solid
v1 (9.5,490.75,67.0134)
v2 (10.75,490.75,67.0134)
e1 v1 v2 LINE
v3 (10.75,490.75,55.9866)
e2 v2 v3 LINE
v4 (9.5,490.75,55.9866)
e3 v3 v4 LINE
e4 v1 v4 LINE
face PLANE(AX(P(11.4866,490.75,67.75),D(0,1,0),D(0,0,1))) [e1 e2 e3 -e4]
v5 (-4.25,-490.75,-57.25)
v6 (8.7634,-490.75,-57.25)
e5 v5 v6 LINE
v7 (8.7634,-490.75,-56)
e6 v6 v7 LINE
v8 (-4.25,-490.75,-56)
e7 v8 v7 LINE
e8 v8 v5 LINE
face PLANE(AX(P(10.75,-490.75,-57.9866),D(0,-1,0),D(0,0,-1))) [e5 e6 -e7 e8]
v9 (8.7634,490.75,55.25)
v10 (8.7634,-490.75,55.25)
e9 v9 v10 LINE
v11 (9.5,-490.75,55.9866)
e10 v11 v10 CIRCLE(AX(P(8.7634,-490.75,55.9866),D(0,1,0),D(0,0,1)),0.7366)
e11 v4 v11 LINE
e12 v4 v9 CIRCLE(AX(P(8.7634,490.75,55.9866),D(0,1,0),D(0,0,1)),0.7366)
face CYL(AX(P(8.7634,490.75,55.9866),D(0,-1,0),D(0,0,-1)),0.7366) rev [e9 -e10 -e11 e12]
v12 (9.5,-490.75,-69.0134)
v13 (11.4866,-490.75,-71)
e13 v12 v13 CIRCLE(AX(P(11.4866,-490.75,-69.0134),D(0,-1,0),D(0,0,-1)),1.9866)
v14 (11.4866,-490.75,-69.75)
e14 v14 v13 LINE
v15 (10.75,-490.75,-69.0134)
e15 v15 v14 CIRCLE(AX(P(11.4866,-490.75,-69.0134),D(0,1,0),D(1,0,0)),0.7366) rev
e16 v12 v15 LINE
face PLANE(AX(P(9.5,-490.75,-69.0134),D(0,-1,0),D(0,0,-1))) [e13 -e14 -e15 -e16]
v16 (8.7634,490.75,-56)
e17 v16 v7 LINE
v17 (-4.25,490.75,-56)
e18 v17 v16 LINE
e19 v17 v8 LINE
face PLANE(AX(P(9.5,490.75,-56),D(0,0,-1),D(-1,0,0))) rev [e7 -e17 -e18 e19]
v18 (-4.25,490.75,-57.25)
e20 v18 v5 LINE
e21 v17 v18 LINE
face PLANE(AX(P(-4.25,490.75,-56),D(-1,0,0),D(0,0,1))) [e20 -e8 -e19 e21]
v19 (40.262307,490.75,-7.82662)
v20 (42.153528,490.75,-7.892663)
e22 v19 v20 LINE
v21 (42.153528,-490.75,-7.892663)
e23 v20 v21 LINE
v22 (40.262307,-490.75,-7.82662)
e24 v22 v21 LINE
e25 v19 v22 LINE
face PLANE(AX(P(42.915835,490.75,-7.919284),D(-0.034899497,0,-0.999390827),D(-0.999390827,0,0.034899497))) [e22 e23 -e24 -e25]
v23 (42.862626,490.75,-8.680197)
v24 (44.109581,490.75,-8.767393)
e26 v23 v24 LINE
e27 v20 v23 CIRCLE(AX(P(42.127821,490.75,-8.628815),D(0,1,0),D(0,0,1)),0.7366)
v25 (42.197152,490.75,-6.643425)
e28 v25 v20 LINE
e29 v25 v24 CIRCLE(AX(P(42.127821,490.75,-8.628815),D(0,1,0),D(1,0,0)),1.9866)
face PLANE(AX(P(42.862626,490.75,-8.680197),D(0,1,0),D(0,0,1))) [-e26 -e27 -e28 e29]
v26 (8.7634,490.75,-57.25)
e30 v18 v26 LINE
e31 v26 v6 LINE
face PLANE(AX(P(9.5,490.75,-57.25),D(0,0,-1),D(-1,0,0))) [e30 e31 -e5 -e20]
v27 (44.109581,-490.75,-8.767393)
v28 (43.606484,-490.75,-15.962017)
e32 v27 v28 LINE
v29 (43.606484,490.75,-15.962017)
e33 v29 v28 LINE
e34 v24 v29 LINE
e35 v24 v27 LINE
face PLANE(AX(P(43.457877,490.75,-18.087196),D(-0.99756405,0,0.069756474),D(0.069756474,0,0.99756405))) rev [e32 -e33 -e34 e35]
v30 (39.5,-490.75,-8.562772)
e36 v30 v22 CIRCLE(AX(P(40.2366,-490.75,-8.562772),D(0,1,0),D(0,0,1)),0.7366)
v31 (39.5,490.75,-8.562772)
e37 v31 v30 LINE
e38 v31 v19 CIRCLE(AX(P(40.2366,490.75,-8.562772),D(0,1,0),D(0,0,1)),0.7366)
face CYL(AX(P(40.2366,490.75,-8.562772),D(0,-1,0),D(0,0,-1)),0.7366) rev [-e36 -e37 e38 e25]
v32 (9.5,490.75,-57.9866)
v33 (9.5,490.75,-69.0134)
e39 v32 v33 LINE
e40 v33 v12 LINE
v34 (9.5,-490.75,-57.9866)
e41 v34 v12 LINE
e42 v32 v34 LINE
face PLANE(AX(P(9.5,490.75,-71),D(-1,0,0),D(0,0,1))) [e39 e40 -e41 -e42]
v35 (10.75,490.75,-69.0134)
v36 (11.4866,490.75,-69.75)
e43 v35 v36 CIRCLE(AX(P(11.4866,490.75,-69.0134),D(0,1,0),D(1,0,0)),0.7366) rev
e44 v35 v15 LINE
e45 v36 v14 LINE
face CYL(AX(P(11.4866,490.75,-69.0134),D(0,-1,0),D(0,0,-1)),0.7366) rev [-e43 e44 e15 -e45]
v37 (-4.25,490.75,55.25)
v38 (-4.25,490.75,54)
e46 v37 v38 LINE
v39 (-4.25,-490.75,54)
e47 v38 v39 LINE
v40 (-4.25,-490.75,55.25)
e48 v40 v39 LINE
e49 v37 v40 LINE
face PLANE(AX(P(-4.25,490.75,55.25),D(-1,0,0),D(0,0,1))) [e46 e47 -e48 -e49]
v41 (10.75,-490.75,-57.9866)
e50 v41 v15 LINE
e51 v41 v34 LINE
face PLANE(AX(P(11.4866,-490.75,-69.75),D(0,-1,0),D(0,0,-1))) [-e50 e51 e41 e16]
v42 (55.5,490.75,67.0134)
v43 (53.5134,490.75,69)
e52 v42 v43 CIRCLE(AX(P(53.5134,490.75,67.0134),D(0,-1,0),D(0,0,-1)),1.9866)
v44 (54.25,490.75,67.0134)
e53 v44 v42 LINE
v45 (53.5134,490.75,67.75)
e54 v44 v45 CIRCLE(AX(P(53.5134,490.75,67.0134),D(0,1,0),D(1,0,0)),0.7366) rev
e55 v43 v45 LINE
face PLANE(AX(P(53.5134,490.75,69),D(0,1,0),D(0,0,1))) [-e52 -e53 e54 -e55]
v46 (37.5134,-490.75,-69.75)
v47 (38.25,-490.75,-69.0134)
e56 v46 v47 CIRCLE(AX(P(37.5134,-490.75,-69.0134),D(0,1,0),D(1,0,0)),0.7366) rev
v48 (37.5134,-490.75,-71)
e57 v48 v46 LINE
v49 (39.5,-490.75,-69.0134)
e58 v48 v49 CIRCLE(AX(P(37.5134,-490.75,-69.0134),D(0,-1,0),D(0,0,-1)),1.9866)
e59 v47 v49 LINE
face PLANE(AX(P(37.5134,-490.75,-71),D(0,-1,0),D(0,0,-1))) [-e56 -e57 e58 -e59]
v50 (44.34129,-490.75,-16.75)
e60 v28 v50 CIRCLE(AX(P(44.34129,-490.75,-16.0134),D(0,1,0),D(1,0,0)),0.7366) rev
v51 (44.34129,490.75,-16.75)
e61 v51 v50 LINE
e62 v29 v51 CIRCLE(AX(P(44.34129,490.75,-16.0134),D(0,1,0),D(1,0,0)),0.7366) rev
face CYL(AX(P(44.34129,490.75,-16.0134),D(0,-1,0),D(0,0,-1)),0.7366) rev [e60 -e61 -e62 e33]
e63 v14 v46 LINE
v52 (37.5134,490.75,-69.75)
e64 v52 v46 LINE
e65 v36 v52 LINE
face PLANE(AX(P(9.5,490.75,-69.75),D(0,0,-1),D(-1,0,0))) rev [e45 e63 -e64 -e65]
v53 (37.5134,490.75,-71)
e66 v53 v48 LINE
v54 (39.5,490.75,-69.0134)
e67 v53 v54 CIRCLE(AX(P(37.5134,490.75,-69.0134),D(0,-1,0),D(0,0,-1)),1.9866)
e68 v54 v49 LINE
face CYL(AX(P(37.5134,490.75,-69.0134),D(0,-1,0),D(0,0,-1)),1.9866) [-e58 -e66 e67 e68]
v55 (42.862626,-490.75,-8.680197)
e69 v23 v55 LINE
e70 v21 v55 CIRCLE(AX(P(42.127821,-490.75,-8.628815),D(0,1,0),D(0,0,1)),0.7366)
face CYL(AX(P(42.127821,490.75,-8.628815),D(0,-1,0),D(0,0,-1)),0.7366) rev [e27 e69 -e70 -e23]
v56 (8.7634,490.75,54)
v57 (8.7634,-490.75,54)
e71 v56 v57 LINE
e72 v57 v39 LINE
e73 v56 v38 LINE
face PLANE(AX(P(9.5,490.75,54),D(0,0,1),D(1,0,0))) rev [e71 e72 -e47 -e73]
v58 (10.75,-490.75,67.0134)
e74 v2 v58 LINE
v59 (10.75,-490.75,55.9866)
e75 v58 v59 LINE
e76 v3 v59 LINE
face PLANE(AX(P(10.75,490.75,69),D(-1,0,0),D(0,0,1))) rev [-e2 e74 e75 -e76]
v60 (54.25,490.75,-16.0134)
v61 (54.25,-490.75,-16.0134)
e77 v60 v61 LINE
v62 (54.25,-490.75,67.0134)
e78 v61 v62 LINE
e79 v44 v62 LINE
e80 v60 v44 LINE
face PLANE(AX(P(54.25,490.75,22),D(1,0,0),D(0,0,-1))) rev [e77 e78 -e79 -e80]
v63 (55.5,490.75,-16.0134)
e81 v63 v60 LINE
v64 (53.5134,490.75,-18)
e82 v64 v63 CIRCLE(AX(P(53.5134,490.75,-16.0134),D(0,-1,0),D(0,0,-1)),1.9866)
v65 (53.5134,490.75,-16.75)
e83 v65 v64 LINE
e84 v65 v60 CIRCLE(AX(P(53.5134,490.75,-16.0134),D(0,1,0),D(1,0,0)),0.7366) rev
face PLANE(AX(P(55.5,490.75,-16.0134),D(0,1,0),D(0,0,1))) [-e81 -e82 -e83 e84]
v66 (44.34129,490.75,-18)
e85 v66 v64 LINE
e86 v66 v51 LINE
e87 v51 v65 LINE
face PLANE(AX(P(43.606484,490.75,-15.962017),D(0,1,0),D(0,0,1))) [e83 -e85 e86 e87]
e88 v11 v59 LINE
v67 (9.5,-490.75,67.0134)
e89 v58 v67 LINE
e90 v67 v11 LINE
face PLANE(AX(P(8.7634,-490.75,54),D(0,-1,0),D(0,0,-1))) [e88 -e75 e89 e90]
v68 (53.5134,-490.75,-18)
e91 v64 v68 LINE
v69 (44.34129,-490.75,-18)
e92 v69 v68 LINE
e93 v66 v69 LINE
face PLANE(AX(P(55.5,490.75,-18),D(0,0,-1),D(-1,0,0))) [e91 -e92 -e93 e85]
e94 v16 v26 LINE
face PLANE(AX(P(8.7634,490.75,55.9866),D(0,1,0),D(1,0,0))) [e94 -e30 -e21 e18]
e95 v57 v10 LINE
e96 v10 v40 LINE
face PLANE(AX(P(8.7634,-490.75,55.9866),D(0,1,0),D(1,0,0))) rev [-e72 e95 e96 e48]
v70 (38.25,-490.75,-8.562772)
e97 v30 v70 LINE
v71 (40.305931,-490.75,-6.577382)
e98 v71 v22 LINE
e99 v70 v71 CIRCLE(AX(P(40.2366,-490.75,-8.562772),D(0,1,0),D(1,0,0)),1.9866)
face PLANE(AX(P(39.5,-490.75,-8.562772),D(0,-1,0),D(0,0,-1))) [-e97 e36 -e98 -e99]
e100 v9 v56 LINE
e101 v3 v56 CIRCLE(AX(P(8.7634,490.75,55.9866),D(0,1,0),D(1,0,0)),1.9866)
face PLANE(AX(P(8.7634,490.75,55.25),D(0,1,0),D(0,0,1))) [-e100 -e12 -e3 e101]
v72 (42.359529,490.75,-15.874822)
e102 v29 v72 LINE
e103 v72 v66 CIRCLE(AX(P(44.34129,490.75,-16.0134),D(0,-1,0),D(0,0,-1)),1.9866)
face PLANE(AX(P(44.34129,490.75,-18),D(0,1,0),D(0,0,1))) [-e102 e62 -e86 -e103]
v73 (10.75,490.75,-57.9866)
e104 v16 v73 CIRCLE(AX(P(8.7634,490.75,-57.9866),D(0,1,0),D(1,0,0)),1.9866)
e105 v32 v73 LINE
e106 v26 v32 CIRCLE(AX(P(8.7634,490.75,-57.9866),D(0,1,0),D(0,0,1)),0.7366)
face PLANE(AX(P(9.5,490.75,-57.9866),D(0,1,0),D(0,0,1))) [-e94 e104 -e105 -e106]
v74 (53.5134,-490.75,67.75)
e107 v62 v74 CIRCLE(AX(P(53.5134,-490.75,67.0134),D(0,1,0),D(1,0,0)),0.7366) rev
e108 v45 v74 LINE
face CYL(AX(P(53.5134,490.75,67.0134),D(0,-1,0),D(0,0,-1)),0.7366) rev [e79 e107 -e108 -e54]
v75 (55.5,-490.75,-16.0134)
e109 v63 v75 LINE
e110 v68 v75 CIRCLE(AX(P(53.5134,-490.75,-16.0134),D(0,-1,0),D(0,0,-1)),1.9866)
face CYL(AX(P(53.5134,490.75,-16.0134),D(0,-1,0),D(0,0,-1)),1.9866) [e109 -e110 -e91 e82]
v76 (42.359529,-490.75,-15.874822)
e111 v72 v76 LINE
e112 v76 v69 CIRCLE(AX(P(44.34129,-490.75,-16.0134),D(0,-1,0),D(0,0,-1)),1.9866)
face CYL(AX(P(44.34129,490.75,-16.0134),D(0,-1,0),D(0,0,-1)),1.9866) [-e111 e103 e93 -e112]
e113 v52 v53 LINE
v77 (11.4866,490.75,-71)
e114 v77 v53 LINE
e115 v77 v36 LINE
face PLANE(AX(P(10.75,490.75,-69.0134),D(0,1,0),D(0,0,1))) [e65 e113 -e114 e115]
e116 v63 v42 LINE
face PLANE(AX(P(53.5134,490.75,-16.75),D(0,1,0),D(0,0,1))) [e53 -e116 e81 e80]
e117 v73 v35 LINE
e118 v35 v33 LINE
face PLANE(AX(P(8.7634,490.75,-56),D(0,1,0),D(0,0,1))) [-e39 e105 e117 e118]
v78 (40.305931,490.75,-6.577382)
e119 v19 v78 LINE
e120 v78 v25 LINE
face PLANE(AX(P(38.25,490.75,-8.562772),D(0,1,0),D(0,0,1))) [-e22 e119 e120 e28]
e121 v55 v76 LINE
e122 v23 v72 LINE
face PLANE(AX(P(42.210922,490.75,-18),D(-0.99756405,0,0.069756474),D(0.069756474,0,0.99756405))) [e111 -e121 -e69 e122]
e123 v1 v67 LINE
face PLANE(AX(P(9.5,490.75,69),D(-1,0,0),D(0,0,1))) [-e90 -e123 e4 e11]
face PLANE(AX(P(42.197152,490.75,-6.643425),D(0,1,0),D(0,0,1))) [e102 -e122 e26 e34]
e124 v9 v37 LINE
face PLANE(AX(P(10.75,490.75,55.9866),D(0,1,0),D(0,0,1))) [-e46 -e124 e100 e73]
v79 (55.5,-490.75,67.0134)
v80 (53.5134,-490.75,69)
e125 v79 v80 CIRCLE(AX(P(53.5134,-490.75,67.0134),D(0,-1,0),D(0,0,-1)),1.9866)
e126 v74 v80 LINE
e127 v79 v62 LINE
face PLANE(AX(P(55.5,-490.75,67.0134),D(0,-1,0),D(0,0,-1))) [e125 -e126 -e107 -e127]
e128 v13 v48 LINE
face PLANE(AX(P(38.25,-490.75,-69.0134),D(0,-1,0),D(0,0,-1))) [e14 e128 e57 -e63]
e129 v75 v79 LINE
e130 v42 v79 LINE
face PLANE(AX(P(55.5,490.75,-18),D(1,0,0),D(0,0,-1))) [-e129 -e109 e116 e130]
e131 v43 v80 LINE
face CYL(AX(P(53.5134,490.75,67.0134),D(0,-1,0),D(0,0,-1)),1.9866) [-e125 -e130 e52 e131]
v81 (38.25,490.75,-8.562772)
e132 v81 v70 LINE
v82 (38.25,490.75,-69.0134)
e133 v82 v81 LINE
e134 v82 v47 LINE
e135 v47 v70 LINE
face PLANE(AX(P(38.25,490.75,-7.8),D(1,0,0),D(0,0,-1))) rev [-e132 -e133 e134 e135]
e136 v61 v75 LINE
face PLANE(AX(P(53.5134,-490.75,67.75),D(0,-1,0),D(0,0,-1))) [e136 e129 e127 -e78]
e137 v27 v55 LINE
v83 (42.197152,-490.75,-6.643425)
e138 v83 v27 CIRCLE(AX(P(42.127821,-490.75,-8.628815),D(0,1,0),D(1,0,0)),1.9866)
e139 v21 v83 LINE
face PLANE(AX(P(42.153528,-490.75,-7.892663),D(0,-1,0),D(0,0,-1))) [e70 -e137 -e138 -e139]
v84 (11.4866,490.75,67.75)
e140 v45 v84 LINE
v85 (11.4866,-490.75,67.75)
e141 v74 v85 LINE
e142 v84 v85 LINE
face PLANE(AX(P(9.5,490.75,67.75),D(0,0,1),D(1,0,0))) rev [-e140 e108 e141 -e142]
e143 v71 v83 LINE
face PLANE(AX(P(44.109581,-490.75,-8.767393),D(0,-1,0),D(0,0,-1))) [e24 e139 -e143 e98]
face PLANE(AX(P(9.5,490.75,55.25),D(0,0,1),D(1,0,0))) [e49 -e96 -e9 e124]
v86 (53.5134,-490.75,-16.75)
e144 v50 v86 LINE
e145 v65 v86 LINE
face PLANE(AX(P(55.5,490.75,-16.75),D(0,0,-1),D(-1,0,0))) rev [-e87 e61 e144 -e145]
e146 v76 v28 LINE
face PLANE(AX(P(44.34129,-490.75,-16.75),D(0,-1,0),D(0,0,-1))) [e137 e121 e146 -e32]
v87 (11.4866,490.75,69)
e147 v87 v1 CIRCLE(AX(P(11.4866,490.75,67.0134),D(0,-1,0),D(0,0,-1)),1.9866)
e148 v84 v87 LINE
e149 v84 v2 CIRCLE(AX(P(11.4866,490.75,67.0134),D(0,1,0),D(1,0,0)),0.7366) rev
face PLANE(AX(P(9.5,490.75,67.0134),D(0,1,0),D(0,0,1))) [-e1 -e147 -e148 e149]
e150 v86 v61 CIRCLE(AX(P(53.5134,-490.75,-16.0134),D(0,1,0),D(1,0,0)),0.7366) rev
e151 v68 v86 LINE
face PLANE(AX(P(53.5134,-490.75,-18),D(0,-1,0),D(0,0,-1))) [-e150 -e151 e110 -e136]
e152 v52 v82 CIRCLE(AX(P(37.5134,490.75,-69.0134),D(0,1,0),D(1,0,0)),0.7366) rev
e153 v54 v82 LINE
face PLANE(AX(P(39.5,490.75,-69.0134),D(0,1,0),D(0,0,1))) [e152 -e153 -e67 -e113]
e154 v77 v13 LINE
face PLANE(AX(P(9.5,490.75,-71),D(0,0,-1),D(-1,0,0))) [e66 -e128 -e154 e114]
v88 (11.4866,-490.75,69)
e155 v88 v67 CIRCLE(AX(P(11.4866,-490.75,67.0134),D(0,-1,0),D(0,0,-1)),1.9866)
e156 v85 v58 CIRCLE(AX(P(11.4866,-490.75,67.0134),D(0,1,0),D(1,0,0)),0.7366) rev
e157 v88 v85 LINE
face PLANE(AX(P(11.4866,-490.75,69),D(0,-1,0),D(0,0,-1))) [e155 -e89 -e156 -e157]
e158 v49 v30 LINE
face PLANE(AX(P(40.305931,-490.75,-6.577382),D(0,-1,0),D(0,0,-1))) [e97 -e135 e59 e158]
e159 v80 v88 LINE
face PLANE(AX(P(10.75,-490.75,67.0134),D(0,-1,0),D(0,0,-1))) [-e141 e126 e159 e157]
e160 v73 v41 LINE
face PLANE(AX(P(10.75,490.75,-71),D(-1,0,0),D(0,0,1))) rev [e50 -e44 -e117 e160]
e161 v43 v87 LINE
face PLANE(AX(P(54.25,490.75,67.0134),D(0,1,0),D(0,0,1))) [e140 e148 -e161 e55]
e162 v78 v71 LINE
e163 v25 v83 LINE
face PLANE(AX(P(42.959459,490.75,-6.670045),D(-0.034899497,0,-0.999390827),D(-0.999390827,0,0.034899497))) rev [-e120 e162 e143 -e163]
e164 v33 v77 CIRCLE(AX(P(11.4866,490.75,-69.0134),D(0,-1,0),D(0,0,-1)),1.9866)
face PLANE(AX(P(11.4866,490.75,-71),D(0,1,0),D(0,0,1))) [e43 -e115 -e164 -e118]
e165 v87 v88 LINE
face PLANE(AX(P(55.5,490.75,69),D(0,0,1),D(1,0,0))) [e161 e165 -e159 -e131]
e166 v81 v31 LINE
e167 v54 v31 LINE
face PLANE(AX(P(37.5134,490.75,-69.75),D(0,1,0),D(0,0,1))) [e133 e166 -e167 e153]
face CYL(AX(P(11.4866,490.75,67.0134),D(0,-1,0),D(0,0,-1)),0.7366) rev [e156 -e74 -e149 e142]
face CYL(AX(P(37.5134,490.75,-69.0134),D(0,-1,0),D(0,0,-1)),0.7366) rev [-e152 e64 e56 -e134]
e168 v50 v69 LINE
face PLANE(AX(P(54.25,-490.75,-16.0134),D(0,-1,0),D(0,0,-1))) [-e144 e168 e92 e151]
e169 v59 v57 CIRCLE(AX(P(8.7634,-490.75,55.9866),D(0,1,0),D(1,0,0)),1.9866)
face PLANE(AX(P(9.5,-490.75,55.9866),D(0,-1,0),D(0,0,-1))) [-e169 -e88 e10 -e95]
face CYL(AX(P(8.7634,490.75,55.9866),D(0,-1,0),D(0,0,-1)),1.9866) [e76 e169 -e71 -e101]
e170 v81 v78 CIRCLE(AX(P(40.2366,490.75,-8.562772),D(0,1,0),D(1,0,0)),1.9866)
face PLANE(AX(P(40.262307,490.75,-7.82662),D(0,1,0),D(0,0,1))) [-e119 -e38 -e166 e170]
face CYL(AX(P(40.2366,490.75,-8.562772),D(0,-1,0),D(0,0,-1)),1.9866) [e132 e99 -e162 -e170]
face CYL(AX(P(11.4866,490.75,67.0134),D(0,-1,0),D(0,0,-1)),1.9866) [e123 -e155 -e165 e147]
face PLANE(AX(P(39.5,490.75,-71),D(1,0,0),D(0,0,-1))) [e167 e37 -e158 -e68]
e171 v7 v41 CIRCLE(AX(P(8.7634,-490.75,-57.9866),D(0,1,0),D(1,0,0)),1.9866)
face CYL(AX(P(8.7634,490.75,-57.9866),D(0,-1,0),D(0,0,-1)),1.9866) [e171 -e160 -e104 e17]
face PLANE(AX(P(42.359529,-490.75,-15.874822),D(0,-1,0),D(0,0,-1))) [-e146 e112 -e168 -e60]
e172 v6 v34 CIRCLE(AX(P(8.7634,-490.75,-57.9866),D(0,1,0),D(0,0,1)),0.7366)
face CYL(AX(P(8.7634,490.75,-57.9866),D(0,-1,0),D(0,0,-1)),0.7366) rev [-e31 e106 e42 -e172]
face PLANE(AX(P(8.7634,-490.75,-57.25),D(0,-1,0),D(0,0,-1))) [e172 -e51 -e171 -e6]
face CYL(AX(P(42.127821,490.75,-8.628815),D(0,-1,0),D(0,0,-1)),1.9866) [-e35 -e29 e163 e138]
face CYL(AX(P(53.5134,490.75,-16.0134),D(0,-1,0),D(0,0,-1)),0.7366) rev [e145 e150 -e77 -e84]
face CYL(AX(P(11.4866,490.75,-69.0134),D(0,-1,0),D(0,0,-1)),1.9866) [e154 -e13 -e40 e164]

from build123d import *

# Parameters (mm, degrees)
BASE_FLANGE1_DEPTH = 490.75


# Sheet-metal steps are written as plain solids
with BuildPart() as part:
    # Sketch1 → Base-Flange1 (new, symmetric)
    with BuildSketch(Plane(origin=(0, 0, 0), x_dir=(1, 0, 0), z_dir=(0, 1, 0))):
        with BuildLine():
            Line((-4.25, 57.25), (8.7634, 57.25))
            ThreePointArc((8.7634, 57.25), (9.284254855, 57.465745145), (9.5, 57.9866))
            Line((9.5, 57.9866), (9.5, 69.0134))
            ThreePointArc((9.5, 69.0134), (10.081861668, 70.418138332), (11.4866, 71))
            Line((11.4866, 71), (37.5134, 71))
            ThreePointArc((37.5134, 71), (38.918138332, 70.418138332), (39.5, 69.0134))
            Line((39.5, 69.0134), (39.5, 17))
            Line((39.5, 17), (39.5, 8.562771629))
            ThreePointArc((39.5, 8.562771629), (39.724914644, 8.032905932), (40.262306969, 7.826620346))
            Line((40.262306969, 7.826620346), (42.153527557, 7.892663224))
            ThreePointArc((42.153527557, 7.892663224), (42.675221066, 8.135932903), (42.862626267, 8.680197126))
            Line((42.862626267, 8.680197126), (42.359529101, 15.874821789))
            ThreePointArc((42.359529101, 15.874821789), (42.88838258, 17.368257942), (44.341289843, 18))
            Line((44.341289843, 18), (53.5134, 18))
            ThreePointArc((53.5134, 18), (54.918138332, 17.418138332), (55.5, 16.0134))
            Line((55.5, 16.0134), (55.5, -22))
            Line((55.5, -22), (55.5, -67.0134))
            ThreePointArc((55.5, -67.0134), (54.918138332, -68.418138332), (53.5134, -69))
            Line((53.5134, -69), (39.5, -69))
            Line((39.5, -69), (11.4866, -69))
            ThreePointArc((11.4866, -69), (10.081861668, -68.418138332), (9.5, -67.0134))
            Line((9.5, -67.0134), (9.5, -55.9866))
            ThreePointArc((9.5, -55.9866), (9.284254855, -55.465745145), (8.7634, -55.25))
            Line((8.7634, -55.25), (-4.25, -55.25))
            Line((-4.25, -55.25), (-4.25, -54))
            Line((-4.25, -54), (8.7634, -54))
            ThreePointArc((8.7634, -54), (10.168138332, -54.581861668), (10.75, -55.9866))
            Line((10.75, -55.9866), (10.75, -67.0134))
            ThreePointArc((10.75, -67.0134), (10.965745145, -67.534254855), (11.4866, -67.75))
            Line((11.4866, -67.75), (39.5, -67.75))
            Line((39.5, -67.75), (53.5134, -67.75))
            ThreePointArc((53.5134, -67.75), (54.034254855, -67.534254855), (54.25, -67.0134))
            Line((54.25, -67.0134), (54.25, -22))
            Line((54.25, -22), (54.25, 16.0134))
            ThreePointArc((54.25, 16.0134), (54.034254855, 16.534254855), (53.5134, 16.75))
            Line((53.5134, 16.75), (44.341289843, 16.75))
            ThreePointArc((44.341289843, 16.75), (43.802574707, 16.515759992), (43.606484164, 15.962017381))
            Line((43.606484164, 15.962017381), (44.10958133, 8.767392718))
            ThreePointArc((44.10958133, 8.767392718), (43.604152098, 7.299519645), (42.197151928, 6.64342469))
            Line((42.197151928, 6.64342469), (40.30593134, 6.577381812))
            ThreePointArc((40.30593134, 6.577381812), (38.856591681, 7.133731182), (38.25, 8.562771629))
            Line((38.25, 8.562771629), (38.25, 17))
            Line((38.25, 17), (38.25, 69.0134))
            ThreePointArc((38.25, 69.0134), (38.034254855, 69.534254855), (37.5134, 69.75))
            Line((37.5134, 69.75), (11.4866, 69.75))
            ThreePointArc((11.4866, 69.75), (10.965745145, 69.534254855), (10.75, 69.0134))
            Line((10.75, 69.0134), (10.75, 57.9866))
            ThreePointArc((10.75, 57.9866), (10.168138332, 56.581861668), (8.7634, 56))
            Line((8.7634, 56), (-4.25, 56))
            Line((-4.25, 56), (-4.25, 57.25))
        make_face()
    extrude(amount=BASE_FLANGE1_DEPTH, both=True)


solid = part.part
